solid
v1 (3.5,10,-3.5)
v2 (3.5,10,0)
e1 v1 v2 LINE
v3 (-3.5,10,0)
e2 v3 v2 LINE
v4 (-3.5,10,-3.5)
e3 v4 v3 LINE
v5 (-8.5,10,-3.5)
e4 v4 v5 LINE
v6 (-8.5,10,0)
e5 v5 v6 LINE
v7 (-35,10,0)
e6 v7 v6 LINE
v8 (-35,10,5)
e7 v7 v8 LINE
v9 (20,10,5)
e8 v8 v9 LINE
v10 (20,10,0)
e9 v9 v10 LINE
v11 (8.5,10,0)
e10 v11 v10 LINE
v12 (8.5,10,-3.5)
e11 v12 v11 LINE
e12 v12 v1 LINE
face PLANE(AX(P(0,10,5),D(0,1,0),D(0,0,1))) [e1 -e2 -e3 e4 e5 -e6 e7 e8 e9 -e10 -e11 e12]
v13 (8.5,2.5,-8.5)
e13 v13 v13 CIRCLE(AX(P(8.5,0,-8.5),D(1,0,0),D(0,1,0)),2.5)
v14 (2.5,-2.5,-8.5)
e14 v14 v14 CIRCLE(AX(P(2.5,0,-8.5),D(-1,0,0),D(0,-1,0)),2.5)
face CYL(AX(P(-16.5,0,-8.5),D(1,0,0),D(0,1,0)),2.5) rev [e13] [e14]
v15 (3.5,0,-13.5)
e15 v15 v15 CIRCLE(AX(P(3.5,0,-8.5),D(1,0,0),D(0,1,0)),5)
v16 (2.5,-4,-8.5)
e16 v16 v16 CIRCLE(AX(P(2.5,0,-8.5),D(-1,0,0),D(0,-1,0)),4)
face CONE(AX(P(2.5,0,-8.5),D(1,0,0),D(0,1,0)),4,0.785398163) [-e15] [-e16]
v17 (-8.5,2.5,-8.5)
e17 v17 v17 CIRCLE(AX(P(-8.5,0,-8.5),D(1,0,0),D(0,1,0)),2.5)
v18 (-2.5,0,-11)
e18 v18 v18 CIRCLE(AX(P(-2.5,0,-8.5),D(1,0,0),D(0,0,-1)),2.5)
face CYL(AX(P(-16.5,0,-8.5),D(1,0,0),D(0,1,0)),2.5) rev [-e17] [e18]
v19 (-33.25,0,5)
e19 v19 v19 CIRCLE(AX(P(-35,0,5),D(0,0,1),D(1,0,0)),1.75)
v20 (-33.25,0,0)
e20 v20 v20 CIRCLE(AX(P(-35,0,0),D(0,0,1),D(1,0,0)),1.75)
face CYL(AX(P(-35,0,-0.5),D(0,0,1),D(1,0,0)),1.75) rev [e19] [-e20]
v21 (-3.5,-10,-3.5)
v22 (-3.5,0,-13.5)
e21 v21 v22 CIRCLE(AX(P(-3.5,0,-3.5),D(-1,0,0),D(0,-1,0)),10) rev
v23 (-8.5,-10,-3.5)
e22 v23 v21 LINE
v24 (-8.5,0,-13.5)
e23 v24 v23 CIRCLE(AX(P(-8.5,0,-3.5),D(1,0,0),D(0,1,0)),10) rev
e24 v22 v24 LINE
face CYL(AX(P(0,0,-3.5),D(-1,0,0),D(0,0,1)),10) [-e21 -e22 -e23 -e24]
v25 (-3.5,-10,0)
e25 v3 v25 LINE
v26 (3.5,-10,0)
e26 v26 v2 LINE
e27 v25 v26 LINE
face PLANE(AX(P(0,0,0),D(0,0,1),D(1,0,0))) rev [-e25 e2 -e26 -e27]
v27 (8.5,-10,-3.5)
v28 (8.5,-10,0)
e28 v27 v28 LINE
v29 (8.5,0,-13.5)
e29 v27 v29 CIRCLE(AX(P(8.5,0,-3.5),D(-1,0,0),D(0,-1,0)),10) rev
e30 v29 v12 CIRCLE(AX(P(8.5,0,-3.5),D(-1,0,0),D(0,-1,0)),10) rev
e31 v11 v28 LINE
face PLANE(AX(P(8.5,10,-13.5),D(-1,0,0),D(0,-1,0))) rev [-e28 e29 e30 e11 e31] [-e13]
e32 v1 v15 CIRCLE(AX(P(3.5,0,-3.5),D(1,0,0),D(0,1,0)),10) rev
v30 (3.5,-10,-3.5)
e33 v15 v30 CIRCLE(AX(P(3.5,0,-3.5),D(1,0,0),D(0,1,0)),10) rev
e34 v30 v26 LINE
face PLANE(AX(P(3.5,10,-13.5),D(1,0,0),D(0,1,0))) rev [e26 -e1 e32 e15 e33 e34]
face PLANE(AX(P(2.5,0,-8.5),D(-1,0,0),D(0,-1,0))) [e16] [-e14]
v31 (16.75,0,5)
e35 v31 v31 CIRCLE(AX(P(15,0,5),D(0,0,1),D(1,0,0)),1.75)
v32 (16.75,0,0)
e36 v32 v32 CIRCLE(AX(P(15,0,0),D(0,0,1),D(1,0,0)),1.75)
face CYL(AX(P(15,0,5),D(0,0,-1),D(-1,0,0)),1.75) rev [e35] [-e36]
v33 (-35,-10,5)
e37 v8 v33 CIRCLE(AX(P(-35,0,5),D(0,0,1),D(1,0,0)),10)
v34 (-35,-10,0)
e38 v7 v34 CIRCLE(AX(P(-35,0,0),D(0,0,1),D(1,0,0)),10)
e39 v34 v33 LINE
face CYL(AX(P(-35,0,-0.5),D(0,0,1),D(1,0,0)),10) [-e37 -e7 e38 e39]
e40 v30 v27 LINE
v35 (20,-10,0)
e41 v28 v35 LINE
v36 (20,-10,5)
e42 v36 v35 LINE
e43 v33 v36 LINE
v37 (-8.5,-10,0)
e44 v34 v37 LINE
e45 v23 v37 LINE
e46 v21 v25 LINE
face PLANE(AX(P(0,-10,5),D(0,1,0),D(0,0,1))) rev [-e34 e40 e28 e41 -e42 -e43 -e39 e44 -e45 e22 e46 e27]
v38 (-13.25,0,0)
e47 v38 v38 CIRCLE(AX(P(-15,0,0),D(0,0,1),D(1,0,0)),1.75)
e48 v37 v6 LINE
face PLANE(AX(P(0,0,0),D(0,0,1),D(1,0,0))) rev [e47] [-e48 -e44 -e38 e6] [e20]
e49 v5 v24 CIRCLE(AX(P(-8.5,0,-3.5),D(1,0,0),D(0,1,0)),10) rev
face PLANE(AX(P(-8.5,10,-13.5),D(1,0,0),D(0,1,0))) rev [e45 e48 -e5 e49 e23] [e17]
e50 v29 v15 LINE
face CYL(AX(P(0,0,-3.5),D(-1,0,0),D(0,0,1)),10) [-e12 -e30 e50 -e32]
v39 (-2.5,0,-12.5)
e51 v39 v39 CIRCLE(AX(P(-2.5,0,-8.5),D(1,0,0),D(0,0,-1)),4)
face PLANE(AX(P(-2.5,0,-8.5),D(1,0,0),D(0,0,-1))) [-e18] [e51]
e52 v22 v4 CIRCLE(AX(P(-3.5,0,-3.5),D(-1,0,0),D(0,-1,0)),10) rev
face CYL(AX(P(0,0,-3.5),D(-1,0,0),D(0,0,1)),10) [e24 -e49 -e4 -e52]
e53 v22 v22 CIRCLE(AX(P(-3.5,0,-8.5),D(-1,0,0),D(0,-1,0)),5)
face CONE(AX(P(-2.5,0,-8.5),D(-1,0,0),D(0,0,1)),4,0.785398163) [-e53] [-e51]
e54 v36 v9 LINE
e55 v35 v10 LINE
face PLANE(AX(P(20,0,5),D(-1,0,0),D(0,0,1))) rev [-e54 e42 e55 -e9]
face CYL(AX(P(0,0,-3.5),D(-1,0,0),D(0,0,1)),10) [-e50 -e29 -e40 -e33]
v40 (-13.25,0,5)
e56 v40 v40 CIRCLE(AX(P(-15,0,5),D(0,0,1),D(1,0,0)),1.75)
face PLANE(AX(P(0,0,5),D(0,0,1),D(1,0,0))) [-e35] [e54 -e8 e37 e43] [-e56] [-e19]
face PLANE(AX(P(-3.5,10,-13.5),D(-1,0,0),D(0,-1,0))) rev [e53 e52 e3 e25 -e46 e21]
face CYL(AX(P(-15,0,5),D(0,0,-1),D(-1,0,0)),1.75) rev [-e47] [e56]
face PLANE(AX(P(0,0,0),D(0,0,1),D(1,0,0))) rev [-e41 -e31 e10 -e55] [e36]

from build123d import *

# Parameters (mm, degrees)
SKETCH_1_W          = 16.5
SKETCH_1_H          = 20
SKETCH_1_R          = 1.75
SKETCH_1_W_2        = 7
SKETCH_1_W_3        = 25
EXTRUDE_1_DEPTH     = 5
SKETCH_2_W          = 5
SKETCH_2_H          = 20
EXTRUDE_2_DEPTH     = 13.5
SKETCH_3_R          = 2.5
CUT_EXTRUDE_1_DEPTH = 25
SKETCH_4_R          = 4
SKETCH_4_R_2        = 2.5
EXTRUDE_3_DEPTH     = 1
EXTRUDE_START       = 1
SKETCH_5_R          = 4
SKETCH_5_R_2        = 2.5
EXTRUDE_4_DEPTH     = 1
CHAMFER_1_SIZE      = 1
CHAMFER_2_SIZE      = 1
FILLET_1_R          = 10
FILLET_2_R          = 10
SKETCH_7_R          = 1.75
CUT_EXTRUDE_2_DEPTH = 5.5


with BuildPart() as part:
    # Эскиз1 → Бобышка-Вытянуть1 (new body)
    # profile 1 of 4: a face of its own
    with BuildSketch(Plane.XY):
        with Locations((-11.75, 0)):
            Rectangle(SKETCH_1_W, SKETCH_1_H)
        with Locations((-15, 0)):
            Circle(SKETCH_1_R, mode=Mode.SUBTRACT)
    # profile 2 of 4: a face of its own
    with BuildSketch(Plane.XY):
        with Locations((11.75, 0)):
            Rectangle(SKETCH_1_W, SKETCH_1_H)
        with Locations((15, 0)):
            Circle(SKETCH_1_R, mode=Mode.SUBTRACT)
    # profile 3 of 4: a face of its own
    with BuildSketch(Plane.XY):
        Rectangle(SKETCH_1_W_2, SKETCH_1_H)
    # profile 4 of 4: a face of its own
    with BuildSketch(Plane.XY):
        with Locations((-32.5, 0)):
            Rectangle(SKETCH_1_W_3, SKETCH_1_H)
    extrude(amount=EXTRUDE_1_DEPTH)

    # Эскиз2 → Бобышка-Вытянуть2 (add)
    with BuildSketch(Plane(origin=(0, 0, 0), x_dir=(-1, 0, 0), z_dir=(0, 0, -1))):
        with Locations((6, 0)):
            Rectangle(SKETCH_2_W, SKETCH_2_H)
        with Locations((-6, 0)):
            Rectangle(SKETCH_2_W, SKETCH_2_H)
    extrude(amount=EXTRUDE_2_DEPTH)

    # Эскиз3 → Вырез-Вытянуть1 (cut)
    with BuildSketch(Plane(origin=(8.5, 0, 0), x_dir=(0, 0, -1), z_dir=(1, 0, 0))):
        with Locations(Location((8.5, 0, 0), (0, 0, 90))):
            Circle(SKETCH_3_R)
    extrude(amount=-CUT_EXTRUDE_1_DEPTH, mode=Mode.SUBTRACT)

    # Эскиз4 → Бобышка-Вытянуть3 (add)
    with BuildSketch(Plane.ZY.offset(-3.5)):
        with Locations(Location((-8.5, 0, 0), (0, 0, 90))):
            Circle(SKETCH_4_R)
        with Locations(Location((-8.5, 0, 0), (0, 0, 90))):
            Circle(SKETCH_4_R_2, mode=Mode.SUBTRACT)
    extrude(amount=EXTRUDE_3_DEPTH)

    # Эскиз5 → Бобышка-Вытянуть4 (add)
    with BuildSketch(Plane(origin=(-3.5, 0, 0), x_dir=(0, 0, -1), z_dir=(1, 0, 0)).offset(EXTRUDE_START)):
        with Locations(Location((8.5, 0, 0), (0, 0, 90))):
            Circle(SKETCH_5_R)
        with Locations(Location((8.5, 0, 0), (0, 0, 90))):
            Circle(SKETCH_5_R_2, mode=Mode.SUBTRACT)
    extrude(amount=-EXTRUDE_4_DEPTH)

    # Фаска1
    chamfer_1_edges = [part.edges().sort_by_distance(p)[0] for p in [
        (-3.5, -4, -8.5),
    ]]
    chamfer(chamfer_1_edges, length=CHAMFER_1_SIZE - 0.0001)  # a hair under: the kernel refuses the full size

    # Фаска2
    chamfer_2_edges = [part.edges().sort_by_distance(p)[0] for p in [
        (3.5, -4, -8.5),
    ]]
    chamfer(chamfer_2_edges, length=CHAMFER_2_SIZE - 0.0001)  # a hair under: the kernel refuses the full size

    # Скругление1
    fillet_1_edges = [part.edges().sort_by_distance(p)[0] for p in [
        (6, 10, -13.5),
        (6, -10, -13.5),
    ]]
    fillet(fillet_1_edges, radius=FILLET_1_R - 0.0001)  # a hair under: the kernel refuses the full size

    # Скругление2
    fillet_2_edges = [part.edges().sort_by_distance(p)[0] for p in [
        (-6, 10, -13.5),
        (-6, -10, -13.5),
    ]]
    fillet(fillet_2_edges, radius=FILLET_2_R - 0.0001)  # a hair under: the kernel refuses the full size

    # Эскиз7 → Вырез-Вытянуть2 (cut)
    with BuildSketch(Plane.XY.offset(5)):
        with BuildLine():
            ThreePointArc((-45, -4.3e-08), (-42.071067826, 7.071067798), (-34.999999996, 10))
            Line((-34.999999996, 10), (-45, 10))
            Line((-45, 10), (-45, -4.3e-08))
        make_face()
        with BuildLine():
            Line((-45, -10), (-35, -10))
            ThreePointArc((-35, -10), (-42.071067797, -7.071067827), (-45, -4.3e-08))
            Line((-45, -4.3e-08), (-45, -10))
        make_face()
        with Locations((-35, 0)):
            Circle(SKETCH_7_R)
    extrude(amount=-CUT_EXTRUDE_2_DEPTH, mode=Mode.SUBTRACT)


solid = part.part
